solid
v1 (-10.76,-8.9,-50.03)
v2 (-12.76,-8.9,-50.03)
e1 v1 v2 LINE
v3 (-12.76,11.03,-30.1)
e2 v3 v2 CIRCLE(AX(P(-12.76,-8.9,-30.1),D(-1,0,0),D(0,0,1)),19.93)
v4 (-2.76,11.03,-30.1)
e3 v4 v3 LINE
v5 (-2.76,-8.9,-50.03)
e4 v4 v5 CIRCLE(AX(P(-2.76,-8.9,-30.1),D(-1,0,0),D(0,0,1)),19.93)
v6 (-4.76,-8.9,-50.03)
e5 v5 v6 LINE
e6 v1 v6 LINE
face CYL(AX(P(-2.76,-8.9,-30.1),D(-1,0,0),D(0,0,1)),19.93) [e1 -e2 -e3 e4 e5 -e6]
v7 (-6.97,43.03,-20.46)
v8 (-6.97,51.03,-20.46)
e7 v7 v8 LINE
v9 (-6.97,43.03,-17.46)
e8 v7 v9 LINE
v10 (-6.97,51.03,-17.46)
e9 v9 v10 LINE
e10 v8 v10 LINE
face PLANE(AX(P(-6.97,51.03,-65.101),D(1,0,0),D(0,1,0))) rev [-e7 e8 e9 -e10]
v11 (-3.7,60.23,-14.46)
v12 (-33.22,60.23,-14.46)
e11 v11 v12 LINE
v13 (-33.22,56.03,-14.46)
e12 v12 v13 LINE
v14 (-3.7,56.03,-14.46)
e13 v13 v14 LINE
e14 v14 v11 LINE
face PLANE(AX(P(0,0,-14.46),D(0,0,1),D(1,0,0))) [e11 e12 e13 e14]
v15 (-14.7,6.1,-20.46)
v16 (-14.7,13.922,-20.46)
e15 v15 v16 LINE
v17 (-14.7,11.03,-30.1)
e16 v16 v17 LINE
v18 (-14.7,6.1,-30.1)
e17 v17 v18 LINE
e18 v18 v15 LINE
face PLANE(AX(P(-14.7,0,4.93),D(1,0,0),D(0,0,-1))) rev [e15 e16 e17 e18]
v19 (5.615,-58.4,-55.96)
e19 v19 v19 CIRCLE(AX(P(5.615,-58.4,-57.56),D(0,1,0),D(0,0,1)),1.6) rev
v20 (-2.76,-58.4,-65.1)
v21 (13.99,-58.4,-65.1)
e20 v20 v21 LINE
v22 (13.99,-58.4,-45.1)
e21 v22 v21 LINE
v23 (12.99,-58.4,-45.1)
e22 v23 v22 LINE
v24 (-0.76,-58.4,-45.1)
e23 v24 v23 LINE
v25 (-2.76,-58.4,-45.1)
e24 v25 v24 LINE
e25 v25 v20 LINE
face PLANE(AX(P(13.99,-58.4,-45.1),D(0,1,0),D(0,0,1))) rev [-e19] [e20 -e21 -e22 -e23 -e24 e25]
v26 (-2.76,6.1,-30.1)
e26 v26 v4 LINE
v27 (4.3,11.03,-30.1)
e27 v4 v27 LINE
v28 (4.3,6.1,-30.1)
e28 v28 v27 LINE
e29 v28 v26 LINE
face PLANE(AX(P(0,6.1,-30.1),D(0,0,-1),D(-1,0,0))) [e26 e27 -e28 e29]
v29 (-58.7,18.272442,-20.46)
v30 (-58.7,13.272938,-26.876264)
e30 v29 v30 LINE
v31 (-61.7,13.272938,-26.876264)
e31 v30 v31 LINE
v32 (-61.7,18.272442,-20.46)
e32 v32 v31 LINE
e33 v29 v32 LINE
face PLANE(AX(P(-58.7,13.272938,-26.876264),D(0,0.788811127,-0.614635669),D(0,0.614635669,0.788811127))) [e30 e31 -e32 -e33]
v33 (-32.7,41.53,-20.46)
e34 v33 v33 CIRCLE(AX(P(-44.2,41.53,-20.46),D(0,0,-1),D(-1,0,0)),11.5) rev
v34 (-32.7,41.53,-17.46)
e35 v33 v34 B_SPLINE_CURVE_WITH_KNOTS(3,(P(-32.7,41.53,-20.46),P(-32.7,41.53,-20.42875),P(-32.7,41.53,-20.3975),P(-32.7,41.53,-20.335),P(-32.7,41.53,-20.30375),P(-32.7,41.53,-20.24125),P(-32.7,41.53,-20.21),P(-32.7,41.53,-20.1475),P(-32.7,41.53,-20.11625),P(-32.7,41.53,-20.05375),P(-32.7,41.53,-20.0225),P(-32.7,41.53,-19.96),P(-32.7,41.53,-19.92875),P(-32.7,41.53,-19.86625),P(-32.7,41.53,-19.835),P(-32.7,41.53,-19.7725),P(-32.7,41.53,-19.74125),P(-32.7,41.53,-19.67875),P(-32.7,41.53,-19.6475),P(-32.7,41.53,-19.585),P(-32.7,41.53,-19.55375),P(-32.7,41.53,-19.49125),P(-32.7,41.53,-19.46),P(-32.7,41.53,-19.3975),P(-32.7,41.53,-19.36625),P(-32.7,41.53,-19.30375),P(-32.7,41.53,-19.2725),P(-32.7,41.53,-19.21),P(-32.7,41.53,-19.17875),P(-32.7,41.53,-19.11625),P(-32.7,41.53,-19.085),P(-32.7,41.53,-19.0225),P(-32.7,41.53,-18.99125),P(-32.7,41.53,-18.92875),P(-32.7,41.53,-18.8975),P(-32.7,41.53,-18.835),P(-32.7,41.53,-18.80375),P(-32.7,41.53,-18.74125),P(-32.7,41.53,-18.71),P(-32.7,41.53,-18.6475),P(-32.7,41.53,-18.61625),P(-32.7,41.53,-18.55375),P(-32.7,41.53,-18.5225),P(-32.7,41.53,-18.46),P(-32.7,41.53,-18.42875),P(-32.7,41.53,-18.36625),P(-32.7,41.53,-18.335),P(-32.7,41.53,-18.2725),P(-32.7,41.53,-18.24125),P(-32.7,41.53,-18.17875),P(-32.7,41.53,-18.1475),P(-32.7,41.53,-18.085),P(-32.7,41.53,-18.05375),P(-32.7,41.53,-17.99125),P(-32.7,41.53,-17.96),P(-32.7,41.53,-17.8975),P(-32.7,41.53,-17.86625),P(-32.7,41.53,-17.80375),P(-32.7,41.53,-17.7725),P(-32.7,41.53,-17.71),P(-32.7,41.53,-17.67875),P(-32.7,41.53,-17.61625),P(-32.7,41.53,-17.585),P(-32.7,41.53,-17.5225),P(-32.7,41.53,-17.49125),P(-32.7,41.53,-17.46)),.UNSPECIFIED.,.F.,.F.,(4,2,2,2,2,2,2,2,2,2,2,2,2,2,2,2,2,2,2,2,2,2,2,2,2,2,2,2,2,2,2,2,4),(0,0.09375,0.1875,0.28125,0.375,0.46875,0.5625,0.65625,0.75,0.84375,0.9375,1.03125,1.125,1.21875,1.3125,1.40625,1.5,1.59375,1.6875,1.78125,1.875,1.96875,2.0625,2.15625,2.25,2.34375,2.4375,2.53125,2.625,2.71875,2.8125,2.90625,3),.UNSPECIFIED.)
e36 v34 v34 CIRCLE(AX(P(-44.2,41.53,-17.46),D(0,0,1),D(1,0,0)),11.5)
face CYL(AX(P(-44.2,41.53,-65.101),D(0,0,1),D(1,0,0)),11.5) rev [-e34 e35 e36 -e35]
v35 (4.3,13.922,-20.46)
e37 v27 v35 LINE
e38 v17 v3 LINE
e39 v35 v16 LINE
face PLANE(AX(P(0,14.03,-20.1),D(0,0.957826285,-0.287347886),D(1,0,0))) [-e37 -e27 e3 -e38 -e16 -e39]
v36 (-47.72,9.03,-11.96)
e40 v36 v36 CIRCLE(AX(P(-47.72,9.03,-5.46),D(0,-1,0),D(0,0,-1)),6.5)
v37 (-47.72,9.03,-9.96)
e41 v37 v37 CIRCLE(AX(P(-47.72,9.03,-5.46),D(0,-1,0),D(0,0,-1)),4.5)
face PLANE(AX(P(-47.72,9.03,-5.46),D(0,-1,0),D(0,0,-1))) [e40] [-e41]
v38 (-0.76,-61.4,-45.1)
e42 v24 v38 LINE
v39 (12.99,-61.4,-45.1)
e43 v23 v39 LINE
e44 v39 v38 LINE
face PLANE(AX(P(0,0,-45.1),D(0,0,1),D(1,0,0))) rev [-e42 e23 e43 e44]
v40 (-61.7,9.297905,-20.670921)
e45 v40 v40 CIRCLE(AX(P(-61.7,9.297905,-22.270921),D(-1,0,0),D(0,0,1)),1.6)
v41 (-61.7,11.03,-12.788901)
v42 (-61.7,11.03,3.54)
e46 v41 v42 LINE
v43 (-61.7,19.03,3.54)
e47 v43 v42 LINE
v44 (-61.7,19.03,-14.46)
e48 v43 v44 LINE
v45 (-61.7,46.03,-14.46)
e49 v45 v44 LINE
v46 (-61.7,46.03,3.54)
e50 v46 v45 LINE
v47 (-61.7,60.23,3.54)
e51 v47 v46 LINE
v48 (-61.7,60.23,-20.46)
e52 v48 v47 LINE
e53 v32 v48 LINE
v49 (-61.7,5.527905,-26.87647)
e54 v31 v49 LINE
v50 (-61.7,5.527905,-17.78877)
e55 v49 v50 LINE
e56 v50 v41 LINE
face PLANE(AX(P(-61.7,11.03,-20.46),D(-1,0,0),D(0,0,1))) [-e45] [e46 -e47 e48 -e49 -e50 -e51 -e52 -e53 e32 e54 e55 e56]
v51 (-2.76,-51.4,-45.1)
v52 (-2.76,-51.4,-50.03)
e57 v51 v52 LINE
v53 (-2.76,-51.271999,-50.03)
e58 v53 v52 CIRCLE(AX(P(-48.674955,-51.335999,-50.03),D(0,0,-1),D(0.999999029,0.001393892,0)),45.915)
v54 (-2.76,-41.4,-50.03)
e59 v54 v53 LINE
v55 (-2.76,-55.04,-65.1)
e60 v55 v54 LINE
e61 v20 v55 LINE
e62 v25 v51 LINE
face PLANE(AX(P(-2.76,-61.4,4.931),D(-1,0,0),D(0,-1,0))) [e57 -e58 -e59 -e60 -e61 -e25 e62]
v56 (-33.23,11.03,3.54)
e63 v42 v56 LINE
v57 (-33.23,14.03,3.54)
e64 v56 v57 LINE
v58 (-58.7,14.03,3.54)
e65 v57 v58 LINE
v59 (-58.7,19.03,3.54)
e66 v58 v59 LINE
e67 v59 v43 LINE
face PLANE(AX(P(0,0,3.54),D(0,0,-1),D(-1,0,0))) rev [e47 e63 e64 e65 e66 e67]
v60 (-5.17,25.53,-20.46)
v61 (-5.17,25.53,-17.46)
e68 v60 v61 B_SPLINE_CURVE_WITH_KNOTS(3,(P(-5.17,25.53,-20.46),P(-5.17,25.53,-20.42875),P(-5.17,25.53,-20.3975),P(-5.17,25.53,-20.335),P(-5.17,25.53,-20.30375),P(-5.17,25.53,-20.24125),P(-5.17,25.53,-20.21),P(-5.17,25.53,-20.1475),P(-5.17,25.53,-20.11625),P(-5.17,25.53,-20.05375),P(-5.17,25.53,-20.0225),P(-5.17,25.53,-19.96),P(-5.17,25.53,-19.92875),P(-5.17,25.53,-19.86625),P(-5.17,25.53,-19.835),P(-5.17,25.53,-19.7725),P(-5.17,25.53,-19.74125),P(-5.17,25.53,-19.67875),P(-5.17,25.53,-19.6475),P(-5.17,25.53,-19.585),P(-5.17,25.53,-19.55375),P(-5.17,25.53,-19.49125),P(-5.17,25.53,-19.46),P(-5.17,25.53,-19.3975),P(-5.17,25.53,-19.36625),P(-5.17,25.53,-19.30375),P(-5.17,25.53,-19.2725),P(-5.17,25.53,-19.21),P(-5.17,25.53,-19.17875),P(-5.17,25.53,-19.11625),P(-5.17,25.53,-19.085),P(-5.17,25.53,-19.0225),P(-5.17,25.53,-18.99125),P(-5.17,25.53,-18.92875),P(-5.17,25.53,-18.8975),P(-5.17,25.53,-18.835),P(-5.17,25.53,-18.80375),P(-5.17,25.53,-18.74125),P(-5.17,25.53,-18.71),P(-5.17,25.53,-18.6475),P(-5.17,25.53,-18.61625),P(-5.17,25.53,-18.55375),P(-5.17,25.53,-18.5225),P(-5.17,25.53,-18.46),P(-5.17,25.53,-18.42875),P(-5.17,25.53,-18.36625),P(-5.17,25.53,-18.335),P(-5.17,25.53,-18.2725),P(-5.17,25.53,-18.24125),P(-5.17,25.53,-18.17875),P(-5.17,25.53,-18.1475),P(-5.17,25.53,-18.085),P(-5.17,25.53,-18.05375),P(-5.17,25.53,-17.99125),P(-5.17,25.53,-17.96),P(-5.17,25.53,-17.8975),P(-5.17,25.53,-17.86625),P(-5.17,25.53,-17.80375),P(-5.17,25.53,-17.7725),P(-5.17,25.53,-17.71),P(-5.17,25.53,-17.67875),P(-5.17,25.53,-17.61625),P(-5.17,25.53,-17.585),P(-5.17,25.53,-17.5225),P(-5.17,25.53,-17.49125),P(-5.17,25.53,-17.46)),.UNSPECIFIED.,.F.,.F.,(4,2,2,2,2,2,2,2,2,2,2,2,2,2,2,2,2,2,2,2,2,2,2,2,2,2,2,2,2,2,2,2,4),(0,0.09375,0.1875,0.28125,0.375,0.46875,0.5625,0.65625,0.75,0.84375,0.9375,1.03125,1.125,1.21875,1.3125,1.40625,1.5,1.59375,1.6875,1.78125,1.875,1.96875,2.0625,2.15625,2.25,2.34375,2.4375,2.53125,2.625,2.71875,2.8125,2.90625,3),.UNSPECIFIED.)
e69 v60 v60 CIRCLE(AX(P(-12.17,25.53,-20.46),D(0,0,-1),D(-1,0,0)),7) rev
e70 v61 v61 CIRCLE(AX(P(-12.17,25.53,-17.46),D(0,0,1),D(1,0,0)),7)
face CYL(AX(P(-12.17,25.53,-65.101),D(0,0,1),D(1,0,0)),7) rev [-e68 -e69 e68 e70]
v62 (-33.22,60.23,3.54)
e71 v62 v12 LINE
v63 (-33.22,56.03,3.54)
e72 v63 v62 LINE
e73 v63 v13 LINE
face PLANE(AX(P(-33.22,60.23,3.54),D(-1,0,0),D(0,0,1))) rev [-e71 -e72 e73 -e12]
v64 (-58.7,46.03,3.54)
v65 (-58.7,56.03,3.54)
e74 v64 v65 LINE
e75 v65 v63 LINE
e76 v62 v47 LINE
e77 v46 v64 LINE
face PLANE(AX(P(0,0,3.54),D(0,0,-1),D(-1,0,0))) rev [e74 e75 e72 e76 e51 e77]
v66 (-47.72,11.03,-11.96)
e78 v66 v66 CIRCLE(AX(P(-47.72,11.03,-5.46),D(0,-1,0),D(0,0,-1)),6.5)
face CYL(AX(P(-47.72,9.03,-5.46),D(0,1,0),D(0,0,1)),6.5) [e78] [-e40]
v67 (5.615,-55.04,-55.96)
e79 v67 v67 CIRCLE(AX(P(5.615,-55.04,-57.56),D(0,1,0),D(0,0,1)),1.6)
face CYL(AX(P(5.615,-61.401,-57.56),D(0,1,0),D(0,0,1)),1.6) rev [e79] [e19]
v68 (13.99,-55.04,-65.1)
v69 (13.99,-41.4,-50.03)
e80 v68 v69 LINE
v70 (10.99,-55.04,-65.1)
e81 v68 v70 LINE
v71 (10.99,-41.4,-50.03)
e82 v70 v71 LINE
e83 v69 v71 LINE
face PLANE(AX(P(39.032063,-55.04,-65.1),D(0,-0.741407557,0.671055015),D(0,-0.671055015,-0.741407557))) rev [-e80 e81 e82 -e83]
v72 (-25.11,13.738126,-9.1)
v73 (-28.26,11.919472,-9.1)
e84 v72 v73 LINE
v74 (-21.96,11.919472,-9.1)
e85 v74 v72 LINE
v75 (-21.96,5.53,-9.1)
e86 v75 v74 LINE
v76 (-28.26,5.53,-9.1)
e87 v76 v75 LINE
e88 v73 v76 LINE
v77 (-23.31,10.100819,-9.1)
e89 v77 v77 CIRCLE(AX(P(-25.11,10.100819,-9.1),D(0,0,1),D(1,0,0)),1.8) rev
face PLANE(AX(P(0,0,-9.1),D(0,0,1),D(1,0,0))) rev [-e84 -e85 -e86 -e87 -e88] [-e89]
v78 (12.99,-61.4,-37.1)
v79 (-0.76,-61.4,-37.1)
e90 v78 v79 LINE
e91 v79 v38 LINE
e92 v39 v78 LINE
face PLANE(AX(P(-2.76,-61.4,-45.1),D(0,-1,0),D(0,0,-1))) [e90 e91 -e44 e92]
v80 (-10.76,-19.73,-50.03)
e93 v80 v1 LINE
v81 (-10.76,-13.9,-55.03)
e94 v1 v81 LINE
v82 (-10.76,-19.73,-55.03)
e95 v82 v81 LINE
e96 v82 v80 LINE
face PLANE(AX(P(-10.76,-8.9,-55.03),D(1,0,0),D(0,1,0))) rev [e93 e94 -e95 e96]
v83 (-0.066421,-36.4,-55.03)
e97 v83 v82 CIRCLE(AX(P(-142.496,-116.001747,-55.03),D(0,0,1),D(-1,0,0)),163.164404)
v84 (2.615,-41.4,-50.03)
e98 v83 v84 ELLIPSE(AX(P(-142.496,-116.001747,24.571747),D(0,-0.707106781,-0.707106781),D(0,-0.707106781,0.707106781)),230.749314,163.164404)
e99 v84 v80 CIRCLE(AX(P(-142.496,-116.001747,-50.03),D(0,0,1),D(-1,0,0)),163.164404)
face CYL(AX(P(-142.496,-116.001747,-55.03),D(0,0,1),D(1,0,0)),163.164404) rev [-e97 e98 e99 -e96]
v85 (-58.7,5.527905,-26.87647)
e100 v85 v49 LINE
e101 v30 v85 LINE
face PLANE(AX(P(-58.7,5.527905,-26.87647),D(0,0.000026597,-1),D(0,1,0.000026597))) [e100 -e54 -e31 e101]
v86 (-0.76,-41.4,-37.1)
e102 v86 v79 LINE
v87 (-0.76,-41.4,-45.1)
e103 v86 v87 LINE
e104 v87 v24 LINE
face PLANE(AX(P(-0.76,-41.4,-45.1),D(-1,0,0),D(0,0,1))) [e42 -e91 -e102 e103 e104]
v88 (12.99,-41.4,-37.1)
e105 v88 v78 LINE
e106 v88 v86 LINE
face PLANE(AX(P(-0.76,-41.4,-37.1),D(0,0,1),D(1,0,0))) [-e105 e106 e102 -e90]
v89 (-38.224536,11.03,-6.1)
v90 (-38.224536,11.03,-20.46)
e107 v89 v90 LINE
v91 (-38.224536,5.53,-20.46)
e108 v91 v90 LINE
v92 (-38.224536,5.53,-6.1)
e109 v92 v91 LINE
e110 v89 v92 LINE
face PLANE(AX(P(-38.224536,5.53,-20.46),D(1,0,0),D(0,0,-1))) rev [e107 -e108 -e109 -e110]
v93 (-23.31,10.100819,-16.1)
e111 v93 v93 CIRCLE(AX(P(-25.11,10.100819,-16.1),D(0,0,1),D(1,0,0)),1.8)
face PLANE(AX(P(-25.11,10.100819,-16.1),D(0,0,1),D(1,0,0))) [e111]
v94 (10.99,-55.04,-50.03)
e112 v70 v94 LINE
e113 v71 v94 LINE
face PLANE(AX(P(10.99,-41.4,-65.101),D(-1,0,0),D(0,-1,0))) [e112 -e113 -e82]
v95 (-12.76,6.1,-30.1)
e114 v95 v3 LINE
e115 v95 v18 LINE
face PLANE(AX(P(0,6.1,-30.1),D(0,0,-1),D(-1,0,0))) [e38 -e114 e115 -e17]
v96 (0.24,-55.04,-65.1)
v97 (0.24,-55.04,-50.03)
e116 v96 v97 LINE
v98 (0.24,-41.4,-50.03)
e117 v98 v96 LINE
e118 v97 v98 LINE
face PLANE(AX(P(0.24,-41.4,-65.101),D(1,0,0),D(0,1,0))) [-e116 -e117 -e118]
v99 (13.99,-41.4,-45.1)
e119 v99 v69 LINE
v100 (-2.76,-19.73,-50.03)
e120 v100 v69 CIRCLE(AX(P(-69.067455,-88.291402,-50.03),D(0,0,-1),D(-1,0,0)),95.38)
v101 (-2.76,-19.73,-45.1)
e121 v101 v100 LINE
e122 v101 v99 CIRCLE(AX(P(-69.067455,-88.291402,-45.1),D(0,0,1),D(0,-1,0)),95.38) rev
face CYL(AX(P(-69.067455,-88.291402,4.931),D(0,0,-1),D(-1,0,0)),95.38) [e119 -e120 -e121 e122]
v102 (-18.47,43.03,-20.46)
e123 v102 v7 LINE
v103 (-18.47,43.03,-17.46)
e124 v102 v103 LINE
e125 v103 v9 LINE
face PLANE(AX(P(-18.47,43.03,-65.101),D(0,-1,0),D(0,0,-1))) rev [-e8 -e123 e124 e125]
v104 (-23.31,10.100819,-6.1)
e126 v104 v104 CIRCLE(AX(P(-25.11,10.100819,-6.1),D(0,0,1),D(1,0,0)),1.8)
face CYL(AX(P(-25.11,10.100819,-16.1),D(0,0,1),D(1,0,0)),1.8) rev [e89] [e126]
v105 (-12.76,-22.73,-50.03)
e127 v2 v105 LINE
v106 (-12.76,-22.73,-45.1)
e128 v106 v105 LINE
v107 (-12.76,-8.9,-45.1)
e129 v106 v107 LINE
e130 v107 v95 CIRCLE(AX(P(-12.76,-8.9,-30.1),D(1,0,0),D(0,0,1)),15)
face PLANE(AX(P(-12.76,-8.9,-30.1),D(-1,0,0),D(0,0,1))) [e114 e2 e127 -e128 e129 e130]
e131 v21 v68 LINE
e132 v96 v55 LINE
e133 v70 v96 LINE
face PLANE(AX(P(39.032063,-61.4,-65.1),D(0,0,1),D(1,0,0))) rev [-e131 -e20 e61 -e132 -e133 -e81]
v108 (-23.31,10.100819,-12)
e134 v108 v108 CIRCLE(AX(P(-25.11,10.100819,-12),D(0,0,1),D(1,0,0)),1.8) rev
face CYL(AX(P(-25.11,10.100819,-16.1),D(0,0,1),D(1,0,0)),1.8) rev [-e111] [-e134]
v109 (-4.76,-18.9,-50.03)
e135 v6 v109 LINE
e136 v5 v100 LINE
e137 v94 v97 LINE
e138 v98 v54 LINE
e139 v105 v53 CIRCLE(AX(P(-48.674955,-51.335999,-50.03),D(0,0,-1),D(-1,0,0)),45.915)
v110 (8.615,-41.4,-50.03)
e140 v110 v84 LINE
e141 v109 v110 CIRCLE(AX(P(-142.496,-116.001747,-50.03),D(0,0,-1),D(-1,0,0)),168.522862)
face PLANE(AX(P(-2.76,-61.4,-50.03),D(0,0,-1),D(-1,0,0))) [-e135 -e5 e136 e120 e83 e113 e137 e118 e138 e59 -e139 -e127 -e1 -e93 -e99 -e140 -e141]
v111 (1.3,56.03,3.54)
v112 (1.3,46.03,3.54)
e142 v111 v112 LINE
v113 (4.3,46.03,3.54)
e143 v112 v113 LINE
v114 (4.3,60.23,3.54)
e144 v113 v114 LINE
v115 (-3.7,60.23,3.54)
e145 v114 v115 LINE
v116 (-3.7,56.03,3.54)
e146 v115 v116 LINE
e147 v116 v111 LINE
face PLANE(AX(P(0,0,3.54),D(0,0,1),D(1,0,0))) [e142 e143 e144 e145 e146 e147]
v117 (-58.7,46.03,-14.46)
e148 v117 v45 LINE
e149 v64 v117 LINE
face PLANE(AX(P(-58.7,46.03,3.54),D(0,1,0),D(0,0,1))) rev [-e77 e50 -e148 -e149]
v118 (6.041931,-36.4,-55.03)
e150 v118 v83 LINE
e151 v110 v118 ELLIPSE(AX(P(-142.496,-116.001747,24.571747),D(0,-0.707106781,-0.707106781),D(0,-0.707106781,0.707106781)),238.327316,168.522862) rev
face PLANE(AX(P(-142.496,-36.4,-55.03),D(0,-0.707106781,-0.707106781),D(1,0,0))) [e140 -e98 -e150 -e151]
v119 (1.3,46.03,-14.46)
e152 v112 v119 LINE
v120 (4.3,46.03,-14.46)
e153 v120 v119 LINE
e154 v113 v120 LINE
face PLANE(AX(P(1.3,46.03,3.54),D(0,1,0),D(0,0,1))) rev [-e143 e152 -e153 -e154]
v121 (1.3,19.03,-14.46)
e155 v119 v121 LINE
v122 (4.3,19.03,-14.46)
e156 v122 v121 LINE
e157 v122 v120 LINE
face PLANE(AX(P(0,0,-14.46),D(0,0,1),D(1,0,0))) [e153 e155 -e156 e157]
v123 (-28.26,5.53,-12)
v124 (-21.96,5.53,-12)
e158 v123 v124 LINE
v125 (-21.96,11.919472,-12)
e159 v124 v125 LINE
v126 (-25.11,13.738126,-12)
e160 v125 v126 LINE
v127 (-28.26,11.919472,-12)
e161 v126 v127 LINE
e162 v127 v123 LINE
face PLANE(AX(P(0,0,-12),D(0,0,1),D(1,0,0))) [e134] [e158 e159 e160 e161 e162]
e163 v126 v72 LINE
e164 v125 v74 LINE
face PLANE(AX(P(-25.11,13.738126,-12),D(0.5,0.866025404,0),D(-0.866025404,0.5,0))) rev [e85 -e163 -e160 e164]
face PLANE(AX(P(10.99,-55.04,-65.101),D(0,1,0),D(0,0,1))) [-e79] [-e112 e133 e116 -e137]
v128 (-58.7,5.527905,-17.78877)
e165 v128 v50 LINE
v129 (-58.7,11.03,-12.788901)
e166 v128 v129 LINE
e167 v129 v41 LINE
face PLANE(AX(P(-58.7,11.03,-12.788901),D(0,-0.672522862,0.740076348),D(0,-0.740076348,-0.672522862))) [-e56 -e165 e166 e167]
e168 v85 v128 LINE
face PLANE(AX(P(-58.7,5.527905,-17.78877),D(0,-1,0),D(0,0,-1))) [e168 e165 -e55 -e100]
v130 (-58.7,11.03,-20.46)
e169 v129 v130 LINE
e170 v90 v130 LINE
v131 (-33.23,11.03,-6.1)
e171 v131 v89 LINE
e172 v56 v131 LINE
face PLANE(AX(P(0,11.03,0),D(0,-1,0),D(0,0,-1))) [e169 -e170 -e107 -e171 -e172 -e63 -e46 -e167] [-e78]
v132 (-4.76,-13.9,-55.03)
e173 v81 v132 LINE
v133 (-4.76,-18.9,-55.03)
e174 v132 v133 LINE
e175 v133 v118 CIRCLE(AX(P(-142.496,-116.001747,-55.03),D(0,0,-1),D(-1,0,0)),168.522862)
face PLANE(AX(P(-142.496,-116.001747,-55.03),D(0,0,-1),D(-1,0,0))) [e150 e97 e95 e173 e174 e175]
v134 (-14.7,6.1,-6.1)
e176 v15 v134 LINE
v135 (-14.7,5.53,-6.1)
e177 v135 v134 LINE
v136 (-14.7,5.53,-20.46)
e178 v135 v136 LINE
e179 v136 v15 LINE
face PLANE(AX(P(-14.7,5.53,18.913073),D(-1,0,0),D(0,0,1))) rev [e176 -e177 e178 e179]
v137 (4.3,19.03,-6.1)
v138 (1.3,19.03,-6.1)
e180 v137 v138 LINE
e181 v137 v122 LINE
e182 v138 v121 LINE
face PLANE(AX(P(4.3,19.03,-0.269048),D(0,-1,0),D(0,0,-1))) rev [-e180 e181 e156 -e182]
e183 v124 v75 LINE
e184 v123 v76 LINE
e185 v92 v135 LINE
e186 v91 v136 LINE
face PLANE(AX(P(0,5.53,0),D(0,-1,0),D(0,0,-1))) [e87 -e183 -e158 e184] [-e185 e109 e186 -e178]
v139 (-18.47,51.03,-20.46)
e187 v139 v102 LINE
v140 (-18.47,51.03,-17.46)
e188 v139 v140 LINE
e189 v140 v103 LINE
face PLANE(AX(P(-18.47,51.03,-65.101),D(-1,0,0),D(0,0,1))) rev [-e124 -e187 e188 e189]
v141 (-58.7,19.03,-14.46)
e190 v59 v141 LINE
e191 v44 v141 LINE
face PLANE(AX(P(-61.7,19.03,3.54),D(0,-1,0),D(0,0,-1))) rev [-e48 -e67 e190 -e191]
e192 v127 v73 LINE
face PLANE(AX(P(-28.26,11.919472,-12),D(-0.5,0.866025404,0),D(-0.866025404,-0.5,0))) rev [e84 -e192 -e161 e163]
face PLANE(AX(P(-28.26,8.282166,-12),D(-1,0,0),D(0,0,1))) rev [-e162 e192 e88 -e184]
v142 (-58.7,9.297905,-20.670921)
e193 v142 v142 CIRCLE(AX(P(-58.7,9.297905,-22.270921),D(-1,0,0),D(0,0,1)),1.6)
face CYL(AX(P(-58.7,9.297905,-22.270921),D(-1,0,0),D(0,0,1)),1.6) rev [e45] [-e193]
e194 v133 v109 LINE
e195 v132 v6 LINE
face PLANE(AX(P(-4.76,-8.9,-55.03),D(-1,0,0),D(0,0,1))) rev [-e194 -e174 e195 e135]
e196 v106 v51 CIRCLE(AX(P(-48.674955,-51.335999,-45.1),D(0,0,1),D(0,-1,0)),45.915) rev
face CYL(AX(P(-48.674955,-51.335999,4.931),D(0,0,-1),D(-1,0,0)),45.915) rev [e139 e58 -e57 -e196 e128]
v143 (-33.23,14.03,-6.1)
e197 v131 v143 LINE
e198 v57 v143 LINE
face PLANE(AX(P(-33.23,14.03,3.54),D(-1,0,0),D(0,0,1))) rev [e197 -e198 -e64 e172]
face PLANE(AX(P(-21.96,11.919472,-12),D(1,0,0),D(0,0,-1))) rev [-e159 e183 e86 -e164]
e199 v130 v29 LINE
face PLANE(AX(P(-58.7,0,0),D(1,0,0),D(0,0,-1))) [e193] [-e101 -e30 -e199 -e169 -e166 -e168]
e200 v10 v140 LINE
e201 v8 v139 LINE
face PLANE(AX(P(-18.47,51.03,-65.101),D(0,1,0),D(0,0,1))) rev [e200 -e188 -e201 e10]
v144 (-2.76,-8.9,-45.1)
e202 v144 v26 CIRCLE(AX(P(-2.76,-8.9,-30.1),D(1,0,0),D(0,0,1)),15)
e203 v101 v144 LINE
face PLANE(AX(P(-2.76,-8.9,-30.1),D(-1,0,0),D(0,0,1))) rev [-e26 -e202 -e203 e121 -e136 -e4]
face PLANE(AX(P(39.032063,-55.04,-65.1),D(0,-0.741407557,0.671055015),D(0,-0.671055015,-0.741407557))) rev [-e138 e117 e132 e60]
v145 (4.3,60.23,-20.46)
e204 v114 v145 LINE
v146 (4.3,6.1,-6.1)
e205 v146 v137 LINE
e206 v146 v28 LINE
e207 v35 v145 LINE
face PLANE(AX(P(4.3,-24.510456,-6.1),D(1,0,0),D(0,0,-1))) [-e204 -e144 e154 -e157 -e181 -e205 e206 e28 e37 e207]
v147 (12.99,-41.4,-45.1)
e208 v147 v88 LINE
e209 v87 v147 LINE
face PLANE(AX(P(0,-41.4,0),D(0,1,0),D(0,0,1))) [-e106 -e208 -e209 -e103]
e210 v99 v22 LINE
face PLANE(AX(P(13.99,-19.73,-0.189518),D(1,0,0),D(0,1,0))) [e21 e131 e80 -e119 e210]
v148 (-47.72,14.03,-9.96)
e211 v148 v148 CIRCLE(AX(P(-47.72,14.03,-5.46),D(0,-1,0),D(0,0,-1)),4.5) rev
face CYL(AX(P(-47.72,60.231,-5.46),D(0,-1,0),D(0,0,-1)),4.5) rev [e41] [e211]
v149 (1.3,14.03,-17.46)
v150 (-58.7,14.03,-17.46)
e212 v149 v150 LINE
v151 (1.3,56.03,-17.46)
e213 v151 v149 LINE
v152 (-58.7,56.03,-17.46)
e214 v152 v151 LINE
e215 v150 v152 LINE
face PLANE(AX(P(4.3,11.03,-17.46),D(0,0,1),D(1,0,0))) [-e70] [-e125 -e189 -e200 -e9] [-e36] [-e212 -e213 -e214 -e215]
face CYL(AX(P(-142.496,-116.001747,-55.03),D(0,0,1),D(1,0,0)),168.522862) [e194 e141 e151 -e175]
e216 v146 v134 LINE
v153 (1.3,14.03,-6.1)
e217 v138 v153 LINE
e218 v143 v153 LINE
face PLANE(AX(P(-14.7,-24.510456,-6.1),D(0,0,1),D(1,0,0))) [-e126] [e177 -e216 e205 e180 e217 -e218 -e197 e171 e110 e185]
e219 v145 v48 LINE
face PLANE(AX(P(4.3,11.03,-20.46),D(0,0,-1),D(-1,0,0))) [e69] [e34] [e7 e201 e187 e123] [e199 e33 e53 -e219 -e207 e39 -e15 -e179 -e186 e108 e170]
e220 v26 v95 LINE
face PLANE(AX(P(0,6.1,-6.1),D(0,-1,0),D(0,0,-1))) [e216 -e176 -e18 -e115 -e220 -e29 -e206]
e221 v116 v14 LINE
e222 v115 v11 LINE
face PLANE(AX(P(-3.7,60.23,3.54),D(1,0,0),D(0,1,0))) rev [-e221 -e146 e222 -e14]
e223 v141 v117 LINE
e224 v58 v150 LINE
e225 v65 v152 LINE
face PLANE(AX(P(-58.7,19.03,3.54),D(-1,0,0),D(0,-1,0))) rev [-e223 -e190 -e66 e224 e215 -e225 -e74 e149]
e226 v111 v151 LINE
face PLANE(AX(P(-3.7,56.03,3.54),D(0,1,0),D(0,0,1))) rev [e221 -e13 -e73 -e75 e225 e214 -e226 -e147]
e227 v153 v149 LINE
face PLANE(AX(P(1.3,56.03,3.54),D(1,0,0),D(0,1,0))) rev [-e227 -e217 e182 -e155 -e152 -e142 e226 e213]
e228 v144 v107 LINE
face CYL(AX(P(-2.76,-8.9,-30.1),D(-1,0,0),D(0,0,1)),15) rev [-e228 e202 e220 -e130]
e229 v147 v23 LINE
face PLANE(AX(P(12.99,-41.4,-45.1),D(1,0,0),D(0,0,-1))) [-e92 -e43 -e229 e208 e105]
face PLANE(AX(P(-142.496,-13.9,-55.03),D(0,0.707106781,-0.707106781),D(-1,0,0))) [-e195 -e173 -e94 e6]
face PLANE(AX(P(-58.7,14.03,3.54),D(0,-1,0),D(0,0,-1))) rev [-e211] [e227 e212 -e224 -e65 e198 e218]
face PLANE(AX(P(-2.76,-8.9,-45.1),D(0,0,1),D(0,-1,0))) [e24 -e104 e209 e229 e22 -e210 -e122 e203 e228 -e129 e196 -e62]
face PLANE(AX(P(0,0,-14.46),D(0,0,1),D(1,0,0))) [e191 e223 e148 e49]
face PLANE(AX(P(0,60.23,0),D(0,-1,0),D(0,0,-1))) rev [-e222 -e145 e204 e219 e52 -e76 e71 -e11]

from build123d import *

# Parameters (mm, degrees)
RESSALTO_EXTRUS_O1_DEPTH              = 4.93
RESSALTO_EXTRUS_O2_DEPTH              = 14.7
RESSALTO_EXTRUS_O3_DEPTH              = 10
ESBO_O5_W                             = 16.75
ESBO_O5_H                             = 41.67
RESSALTO_EXTRUS_O4_DEPTH              = 4.93
CORTE_EXTRUS_O1_REACH                 = 85.706
RESSALTO_EXTRUS_O5_DEPTH              = 16.75
RESSALTO_EXTRUS_O6_DEPTH              = 19
CORTE_EXTRUS_O2_REACH                 = 96.288
ESBO_O9_W                             = 10.75
ESBO_O9_H                             = 13.64
CORTE_EXTRUS_O3_REACH                 = 96.288
ESBO_O10_W                            = 13
ESBO_O10_H                            = 15.64
ESBO_O11_W                            = 13.75
ESBO_O11_H                            = 8
RESSALTO_EXTRUS_O7_DEPTH              = 20
ESBO_O12_W                            = 6
ESBO_O12_H                            = 39.4
RESSALTO_EXTRUS_O8_DEPTH              = 5
RESSALTO_EXTRUS_O9_DEPTH              = 5
CHANFRO1_SIZE                         = 5
CHANFRO2_SIZE                         = 5
CORTE_EXTRUS_O4_REACH                 = 95.911
ESBO_O14_R                            = 1.6
ESBO_O15_W                            = 19
ESBO_O15_H                            = 24
RESSALTO_EXTRUS_O10_DEPTH             = 3
RESSALTO_EXTRUS_O10_DIRECTION_2_REACH = 100.49
RESSALTO_EXTRUS_O11_DEPTH             = 46.2
RESSALTO_EXTRUS_O11_DEPTH_BACK        = 3
ESBO_O16_W                            = 66
ESBO_O16_H                            = 3
RESSALTO_EXTRUS_O12_DEPTH             = 21
ESBO_O18_W                            = 29.52
ESBO_O18_H                            = 4.2
ESBO_O18_W_2                          = 3
ESBO_O18_H_2                          = 32
ESBO_O18_W_3                          = 18.53
ESBO_O18_H_3                          = 3
ESBO_O18_H_4                          = 27
RESSALTO_EXTRUS_O13_DEPTH             = 3
CORTE_EXTRUS_O5_REACH                 = 101.229
ESBO_O19_R                            = 11.5
ESBO_O19_R_2                          = 7
ESBO_O19_W                            = 11.5
ESBO_O19_H                            = 8
CHANFRO3_SIZE                         = 3
CHANFRO3_SIZE_2                       = 10
CORTE_EXTRUS_O6_REACH                 = 117.287
ESBO_O20_R                            = 4.5
RESSALTO_EXTRUS_O14_START             = 2
ESBO_O21_R                            = 6.5
ESBO_O21_R_2                          = 4.5
RESSALTO_EXTRUS_O14_DEPTH             = 2
ESBO_O24_W                            = 3
ESBO_O24_H                            = 5
RESSALTO_EXTRUS_O15_DEPTH             = 8.36
ESBO_O25_W                            = 8
ESBO_O25_H                            = 6
RESSALTO_EXTRUS_O16_DEPTH             = 5.5
ESBO_O26_R                            = 1.6
RESSALTO_EXTRUS_O17_DEPTH             = 3
ESBO_O28_W                            = 16.75
ESBO_O28_H                            = 3
CORTE_EXTRUS_O7_DEPTH                 = 20
ESBO_O29_W                            = 19
ESBO_O29_H                            = 2.999181093
CORTE_EXTRUS_O8_DEPTH                 = 20
ESBO_O30_W                            = 19
ESBO_O30_H                            = 72.430818907
CORTE_EXTRUS_O9_DEPTH                 = 106.156312221
RESSALTO_EXTRUS_O18_REACH             = 102.704
ESBO_O31_W                            = 23.524536133
ESBO_O31_H                            = 8.5
RESSALTO_EXTRUS_O18_DIRECTION_2_REACH = 102.704
ESBO_O32_R                            = 1.8
CORTE_EXTRUS_O10_DEPTH                = 10
CORTE_EXTRUS_O11_START                = -3
CORTE_EXTRUS_O11_DEPTH                = 2.9


# Some blends are built 0.0001 mm under size
with BuildPart() as part:
    # Esboço1 → Ressalto-extrusão1 (new body)
    with BuildSketch(Plane.XY):
        Polygon((0, 0), (-14.7, 0), (-14.7, -61.4), (4.3, -61.4), (4.3, -39.4), align=None)
    extrude(amount=RESSALTO_EXTRUS_O1_DEPTH)

    # Esboço2 → Ressalto-extrusão2 (add)
    with BuildSketch(Plane.ZY.offset(14.7)):
        with BuildLine():
            Line((0, 0), (4.93, 0))
            ThreePointArc((4.93, 0), (1.699387796, 7.799387796), (-6.1, 11.03))
            Line((-6.1, 11.03), (-30.1, 11.03))
            Line((-30.1, 11.03), (-30.1, 6.1))
            Line((-30.1, 6.1), (-6.1, 6.1))
            ThreePointArc((-6.1, 6.1), (-1.786648635, 4.313351365), (0, 0))
        make_face()
    extrude(amount=-RESSALTO_EXTRUS_O2_DEPTH)

    # Esboço4 → Ressalto-extrusão3 (add)
    with BuildSketch(Plane.ZY.offset(12.76)):
        with BuildLine():
            Line((-30.1, 11.03), (-30.1, 6.1))
            ThreePointArc((-30.1, 6.1), (-40.706601718, 1.706601718), (-45.1, -8.9))
            Line((-45.1, -8.9), (-45.1, -61.4))
            Line((-45.1, -61.4), (-50.03, -61.4))
            Line((-50.03, -61.4), (-50.03, -8.9))
            ThreePointArc((-50.03, -8.9), (-44.192638149, 5.192638149), (-30.1, 11.03))
        make_face()
    extrude(amount=-RESSALTO_EXTRUS_O3_DEPTH)

    # Esboço5 → Ressalto-extrusão4 (add)
    with BuildSketch(Plane(origin=(0, 0, -50.03), x_dir=(-1, 0, 0), z_dir=(0, 0, -1))):
        with Locations((-5.615, -40.565)):
            Rectangle(ESBO_O5_W, ESBO_O5_H)
    extrude(amount=-RESSALTO_EXTRUS_O4_DEPTH)

    # Esboço6 → Corte-extrusão1 (cut, up to next)
    with BuildSketch(Plane(origin=(0, 0, -50.03), x_dir=(-1, 0, 0), z_dir=(0, 0, -1)), mode=Mode.PRIVATE) as corte_extrus_o1_sk1:
        with BuildLine():
            Line((12.76, -61.4), (2.76, -61.4))
            Line((2.76, -61.4), (2.76, -51.4))
            ThreePointArc((2.76, -51.4), (5.321457267, -36.21444446), (12.76, -22.73))
            Line((12.76, -22.73), (12.76, -61.4))
        make_face()
    corte_extrus_o1_tool1 = extrude(corte_extrus_o1_sk1.sketch, amount=-CORTE_EXTRUS_O1_REACH, mode=Mode.PRIVATE) & part.part
    # Esboço6 → Corte-extrusão1 (cut, up to next)
    with BuildSketch(Plane(origin=(0, 0, -50.03), x_dir=(-1, 0, 0), z_dir=(0, 0, -1)), mode=Mode.PRIVATE) as corte_extrus_o1_sk2:
        with BuildLine():
            Line((-13.99, -41.4), (-13.99, -19.73))
            Line((-13.99, -19.73), (2.76, -19.73))
            ThreePointArc((2.76, -19.73), (-6.396882999, -29.960637276), (-13.99, -41.4))
        make_face()
    corte_extrus_o1_tool2 = extrude(corte_extrus_o1_sk2.sketch, amount=-CORTE_EXTRUS_O1_REACH, mode=Mode.PRIVATE) & part.part
    add(corte_extrus_o1_tool1.solids().sort_by_distance((-8.393606, -45.852679, -50.03))[0], mode=Mode.SUBTRACT)
    add(corte_extrus_o1_tool2.solids().sort_by_distance((8.680645, -26.580869, -50.03))[0], mode=Mode.SUBTRACT)

    # Esboço7 → Ressalto-extrusão5 (add)
    with BuildSketch(Plane.ZY.offset(2.76)):
        Polygon((-50.03, -61.4), (-65.1, -61.4), (-65.1, -55.04), (-50.03, -41.4), align=None)
    extrude(amount=-RESSALTO_EXTRUS_O5_DEPTH)

    # Esboço8 → Ressalto-extrusão6 (add)
    with BuildSketch(Plane.ZY.offset(14.7)):
        Polygon((4.93, -61.4), (20, -61.4), (20, -55.04), (4.93, -39.4), align=None)
    extrude(amount=-RESSALTO_EXTRUS_O6_DEPTH)

    # Esboço9 → Corte-extrusão2 (cut, up to next)
    with BuildSketch(Plane(origin=(0, 0, -50.03), x_dir=(-1, 0, 0), z_dir=(0, 0, -1)), mode=Mode.PRIVATE) as corte_extrus_o2_sk1:
        with Locations((-5.615, -48.22)):
            Rectangle(ESBO_O9_W, ESBO_O9_H)
    corte_extrus_o2_tool1 = extrude(corte_extrus_o2_sk1.sketch, amount=CORTE_EXTRUS_O2_REACH, mode=Mode.PRIVATE) & part.part
    add(corte_extrus_o2_tool1.solids().sort_by_distance((5.615, -48.22, -50.03))[0], mode=Mode.SUBTRACT)

    # Esboço10 → Corte-extrusão3 (cut, up to next)
    with BuildSketch(Plane.XY.offset(4.93), mode=Mode.PRIVATE) as corte_extrus_o3_sk1:
        with Locations((-5.2, -47.22)):
            Rectangle(ESBO_O10_W, ESBO_O10_H)
    corte_extrus_o3_tool1 = extrude(corte_extrus_o3_sk1.sketch, amount=CORTE_EXTRUS_O3_REACH, mode=Mode.PRIVATE) & part.part
    add(corte_extrus_o3_tool1.solids().sort_by_distance((-5.2, -47.22, 4.93))[0], mode=Mode.SUBTRACT)

    # Esboço11 → Ressalto-extrusão7 (add)
    with BuildSketch(Plane.XZ.offset(61.4)):
        with Locations((6.115, -41.1)):
            Rectangle(ESBO_O11_W, ESBO_O11_H)
    extrude(amount=-RESSALTO_EXTRUS_O7_DEPTH)

    # Esboço12 → Ressalto-extrusão8 (add)
    with BuildSketch(Plane.XY.offset(4.93)):
        with Locations((-7.35, -19.7)):
            Rectangle(ESBO_O12_W, ESBO_O12_H)
    extrude(amount=RESSALTO_EXTRUS_O8_DEPTH)

    # Esboço13 → Ressalto-extrusão9 (add)
    with BuildSketch(Plane(origin=(0, 0, -50.03), x_dir=(-1, 0, 0), z_dir=(0, 0, -1))):
        with BuildLine():
            Line((10.76, -8.9), (4.76, -8.9))
            Line((4.76, -8.9), (4.76, -18.9))
            ThreePointArc((4.76, -18.9), (-2.365001835, -29.889929465), (-8.615, -41.4))
            Line((-8.615, -41.4), (-2.615, -41.4))
            ThreePointArc((-2.615, -41.4), (3.649096622, -30.303670043), (10.76, -19.73))
            Line((10.76, -19.73), (10.76, -8.9))
        make_face()
    extrude(amount=RESSALTO_EXTRUS_O9_DEPTH)

    # Chanfro1
    chanfro1_edges = [part.edges().sort_by_distance(p)[0] for p in [
        (-7.76, -8.9, -55.03),
        (5.615, -41.4, -55.03),
    ]]
    chamfer(chanfro1_edges, length=CHANFRO1_SIZE - 0.0001)  # a hair under: the kernel refuses the full size

    # Chanfro2
    chanfro2_edges = [part.edges().sort_by_distance(p)[0] for p in [
        (-7.35, -39.4, 9.93),
        (-7.35, 0, 9.93),
    ]]
    chamfer(chanfro2_edges, length=CHANFRO2_SIZE - 0.0001)  # a hair under: the kernel refuses the full size

    # Esboço14 → Corte-extrusão4 (cut, up to next)
    with BuildSketch(Plane(origin=(0, -55.04, 0), x_dir=(1, 0, 0), z_dir=(0, 1, 0)), mode=Mode.PRIVATE) as corte_extrus_o4_sk1:
        with Locations(Location((-5.2, -12.465, 0), (0, 0, 270))):
            Circle(ESBO_O14_R)
    corte_extrus_o4_tool1 = extrude(corte_extrus_o4_sk1.sketch, amount=-CORTE_EXTRUS_O4_REACH, mode=Mode.PRIVATE) & part.part
    # Esboço14 → Corte-extrusão4 (cut, up to next)
    with BuildSketch(Plane(origin=(0, -55.04, 0), x_dir=(1, 0, 0), z_dir=(0, 1, 0)), mode=Mode.PRIVATE) as corte_extrus_o4_sk2:
        with Locations(Location((5.615, 57.56, 0), (0, 0, 270))):
            Circle(ESBO_O14_R)
    corte_extrus_o4_tool2 = extrude(corte_extrus_o4_sk2.sketch, amount=-CORTE_EXTRUS_O4_REACH, mode=Mode.PRIVATE) & part.part
    add(corte_extrus_o4_tool1.solids().sort_by_distance((-5.2, -55.04, 12.465))[0], mode=Mode.SUBTRACT)
    add(corte_extrus_o4_tool2.solids().sort_by_distance((5.615, -55.04, -57.56))[0], mode=Mode.SUBTRACT)

    # Esboço15 → Ressalto-extrusão10 (add)
    with BuildSketch(Plane(origin=(0, 11.03, 0), x_dir=(1, 0, 0), z_dir=(0, 1, 0))):
        with Locations((-5.2, 18.1)):
            Rectangle(ESBO_O15_W, ESBO_O15_H)
    extrude(amount=RESSALTO_EXTRUS_O10_DEPTH)

    # Ressalto-extrusão10 direction 2: up to this face of the body (flat: up to its plane)
    ressalto_extrus_o10_direction_2_end = Plane(part.part.faces().sort_by_distance((-7.35, 6.1, -18.1))[0])
    # Esboço15 → Ressalto-extrusão10 direction 2 (add, up to the picked face)
    with BuildSketch(Plane(origin=(0, 11.03, 0), x_dir=(1, 0, 0), z_dir=(0, 1, 0)), mode=Mode.PRIVATE) as ressalto_extrus_o10_direction_2_sk1:
        with Locations((-5.2, 18.1)):
            Rectangle(ESBO_O15_W, ESBO_O15_H)
    ressalto_extrus_o10_direction_2_tool1 = split(extrude(ressalto_extrus_o10_direction_2_sk1.sketch, amount=-RESSALTO_EXTRUS_O10_DIRECTION_2_REACH, mode=Mode.PRIVATE), bisect_by=ressalto_extrus_o10_direction_2_end, keep=Keep.BOTH, mode=Mode.PRIVATE)
    add(ressalto_extrus_o10_direction_2_tool1.solids().sort_by(Axis((-5.2, 11.03, -18.1), (0, -1, 0)))[0])

    # Esboço16 → Ressalto-extrusão11 (add, two sides: drawn at the far end of the back side and taken through both)
    with BuildSketch(Plane(origin=(0, 14.03, 0), x_dir=(1, 0, 0), z_dir=(0, 1, 0)).offset(-RESSALTO_EXTRUS_O11_DEPTH_BACK)):
        with Locations((-28.7, 18.96)):
            Rectangle(ESBO_O16_W, ESBO_O16_H)
    extrude(amount=RESSALTO_EXTRUS_O11_DEPTH + RESSALTO_EXTRUS_O11_DEPTH_BACK)

    # Esboço17 → Ressalto-extrusão12 (add)
    with BuildSketch(Plane.XY.offset(-17.46)):
        Polygon((-61.7, 60.23), (-33.22, 60.23), (-33.22, 56.03), (-58.7, 56.03), (-58.7, 46.03), (-61.7, 46.03), align=None)
        Polygon((-61.7, 11.03), (-61.7, 19.03), (-58.7, 19.03), (-58.7, 14.03), (-33.23, 14.03), (-33.23, 11.03), align=None)
        Polygon((4.3, 60.23), (4.3, 46.03), (1.3, 46.03), (1.3, 56.03), (-3.7, 56.03), (-3.7, 60.23), align=None)
    extrude(amount=RESSALTO_EXTRUS_O12_DEPTH)

    # Esboço18 → Ressalto-extrusão13 (add)
    with BuildSketch(Plane.XY.offset(-17.46)):
        with Locations((-18.46, 58.13)):
            Rectangle(ESBO_O18_W, ESBO_O18_H)
        with Locations((2.8, 30.03)):
            Rectangle(ESBO_O18_W_2, ESBO_O18_H_2)
        with Locations((-23.965, 12.53)):
            Rectangle(ESBO_O18_W_3, ESBO_O18_H_3)
        with Locations((-60.2, 32.53)):
            Rectangle(ESBO_O18_W_2, ESBO_O18_H_4)
    extrude(amount=RESSALTO_EXTRUS_O13_DEPTH)

    # Esboço19 → Corte-extrusão5 (cut, up to next)
    with BuildSketch(Plane.XY.offset(-17.46), mode=Mode.PRIVATE) as corte_extrus_o5_sk1:
        with Locations((-44.2, 41.53)):
            Circle(ESBO_O19_R)
    corte_extrus_o5_tool1 = extrude(corte_extrus_o5_sk1.sketch, amount=-CORTE_EXTRUS_O5_REACH, mode=Mode.PRIVATE) & part.part
    # Esboço19 → Corte-extrusão5 (cut, up to next)
    with BuildSketch(Plane.XY.offset(-17.46), mode=Mode.PRIVATE) as corte_extrus_o5_sk2:
        with Locations((-12.17, 25.53)):
            Circle(ESBO_O19_R_2)
    corte_extrus_o5_tool2 = extrude(corte_extrus_o5_sk2.sketch, amount=-CORTE_EXTRUS_O5_REACH, mode=Mode.PRIVATE) & part.part
    # Esboço19 → Corte-extrusão5 (cut, up to next)
    with BuildSketch(Plane.XY.offset(-17.46), mode=Mode.PRIVATE) as corte_extrus_o5_sk3:
        with Locations((-12.72, 47.03)):
            Rectangle(ESBO_O19_W, ESBO_O19_H)
    corte_extrus_o5_tool3 = extrude(corte_extrus_o5_sk3.sketch, amount=-CORTE_EXTRUS_O5_REACH, mode=Mode.PRIVATE) & part.part
    add(corte_extrus_o5_tool1.solids().sort_by_distance((-44.2, 41.53, -17.46))[0], mode=Mode.SUBTRACT)
    add(corte_extrus_o5_tool2.solids().sort_by_distance((-12.17, 25.53, -17.46))[0], mode=Mode.SUBTRACT)
    add(corte_extrus_o5_tool3.solids().sort_by_distance((-12.72, 47.03, -17.46))[0], mode=Mode.SUBTRACT)

    # Chanfro3
    # the kernel refuses this chamfer: 10, 3 mm, written as the material it takes off along each edge
    with BuildSketch(Plane(origin=(30.259416678, 14.03, -30.1), x_dir=(0, -0.9925205348140391, -0.12207779475585895), z_dir=(-1, 0, 0))) as chanfro3_piece_1_section:
        Polygon((CHANFRO3_SIZE * 0.992520534814, CHANFRO3_SIZE * 0.122077794756), (-CHANFRO3_SIZE_2 * 0.122077794756, CHANFRO3_SIZE_2 * 0.992520534814), (0, 0), align=None)
    chanfro3_piece_1 = extrude(amount=70.918833356, mode=Mode.PRIVATE)
    chanfro3_piece_1 = split(chanfro3_piece_1, bisect_by=Plane(origin=(0.77, 13.028749035, -20.46), z_dir=(0, 0, -1)), keep=Keep.TOP, mode=Mode.PRIVATE)
    add(chanfro3_piece_1, mode=Mode.SUBTRACT)

    # Esboço20 → Corte-extrusão6 (cut, up to next)
    with BuildSketch(Plane.XZ.offset(-11.03), mode=Mode.PRIVATE) as corte_extrus_o6_sk1:
        with Locations(Location((-47.72, -5.46, 0), (0, 0, 270))):
            Circle(ESBO_O20_R)
    corte_extrus_o6_tool1 = extrude(corte_extrus_o6_sk1.sketch, amount=-CORTE_EXTRUS_O6_REACH, mode=Mode.PRIVATE) & part.part
    add(corte_extrus_o6_tool1.solids().sort_by_distance((-47.72, 11.03, -5.46))[0], mode=Mode.SUBTRACT)

    # Esboço21 → Ressalto-extrusão14 (add)
    with BuildSketch(Plane.XZ.offset(-11.03).offset(RESSALTO_EXTRUS_O14_START)):
        with Locations(Location((-47.72, -5.46, 0), (0, 0, 270))):
            Circle(ESBO_O21_R)
        with Locations(Location((-47.72, -5.46, 0), (0, 0, 270))):
            Circle(ESBO_O21_R_2, mode=Mode.SUBTRACT)
    extrude(amount=-RESSALTO_EXTRUS_O14_DEPTH)

    # Esboço24 → Ressalto-extrusão15 (add)
    with BuildSketch(Plane.XY.offset(-14.46)):
        with Locations((2.8, 16.53)):
            Rectangle(ESBO_O24_W, ESBO_O24_H)
    extrude(amount=RESSALTO_EXTRUS_O15_DEPTH)

    # Esboço25 → Ressalto-extrusão16 (add)
    with BuildSketch(Plane.XZ.offset(-11.03)):
        with Locations((-34.224536133, -17.46)):
            Rectangle(ESBO_O25_W, ESBO_O25_H)
    extrude(amount=RESSALTO_EXTRUS_O16_DEPTH)

    # Esboço26 → Ressalto-extrusão17 (add)
    with BuildSketch(Plane.ZY.offset(61.7)):
        Polygon((-12.788900808, 11.03), (-17.788769684, 5.527904968), (-26.876469574, 5.527904968), (-26.87626358, 13.272938232), (-20.46, 18.272442322), (-20.46, 11.03), align=None)
        with Locations((-22.27092052, 9.297904968)):
            Circle(ESBO_O26_R, mode=Mode.SUBTRACT)
    extrude(amount=-RESSALTO_EXTRUS_O17_DEPTH)

    # Esboço28 → Corte-extrusão7 (cut)
    with BuildSketch(Plane(origin=(0, 0, -65.1), x_dir=(-1, 0, 0), z_dir=(0, 0, -1))):
        with Locations((-5.615, -59.9)):
            Rectangle(ESBO_O28_W, ESBO_O28_H)
    extrude(amount=-CORTE_EXTRUS_O7_DEPTH, mode=Mode.SUBTRACT)

    # Esboço29 → Corte-extrusão8 (cut)
    with BuildSketch(Plane.XY.offset(20)):
        with Locations((-5.2, -59.900409454)):
            Rectangle(ESBO_O29_W, ESBO_O29_H)
    extrude(amount=-CORTE_EXTRUS_O8_DEPTH, mode=Mode.SUBTRACT)

    # Esboço30 → Corte-extrusão9 (cut, through all)
    with BuildSketch(Plane.XY.offset(-6.1)):
        with Locations((-5.2, -22.185409454)):
            Rectangle(ESBO_O30_W, ESBO_O30_H)
    extrude(amount=CORTE_EXTRUS_O9_DEPTH, mode=Mode.SUBTRACT)

    # Ressalto-extrusão18: up to this face of the body (flat: up to its plane)
    ressalto_extrus_o18_end = Plane(part.part.faces().sort_by_distance((-4.475668498, 10.650350395, -6.1))[0])
    # Esboço31 → Ressalto-extrusão18 (add, up to the picked face)
    with BuildSketch(Plane.XY.offset(-14.46), mode=Mode.PRIVATE) as ressalto_extrus_o18_sk1:
        with Locations((-26.462268067, 9.78)):
            Rectangle(ESBO_O31_W, ESBO_O31_H)
    ressalto_extrus_o18_tool1 = split(extrude(ressalto_extrus_o18_sk1.sketch, amount=RESSALTO_EXTRUS_O18_REACH, mode=Mode.PRIVATE), bisect_by=ressalto_extrus_o18_end, keep=Keep.BOTH, mode=Mode.PRIVATE)
    add(ressalto_extrus_o18_tool1.solids().sort_by(Axis((-26.462268, 9.78, -14.46), (0, 0, 1)))[0])

    # Ressalto-extrusão18 direction 2: up to this face of the body (flat: up to its plane)
    ressalto_extrus_o18_direction_2_end = Plane(part.part.faces().sort_by_distance((-28.083039106, 35.073559946, -20.46))[0])
    # Esboço31 → Ressalto-extrusão18 direction 2 (add, up to the picked face)
    with BuildSketch(Plane.XY.offset(-14.46), mode=Mode.PRIVATE) as ressalto_extrus_o18_direction_2_sk1:
        with Locations((-26.462268067, 9.78)):
            Rectangle(ESBO_O31_W, ESBO_O31_H)
    ressalto_extrus_o18_direction_2_tool1 = split(extrude(ressalto_extrus_o18_direction_2_sk1.sketch, amount=-RESSALTO_EXTRUS_O18_DIRECTION_2_REACH, mode=Mode.PRIVATE), bisect_by=ressalto_extrus_o18_direction_2_end, keep=Keep.BOTH, mode=Mode.PRIVATE)
    add(ressalto_extrus_o18_direction_2_tool1.solids().sort_by(Axis((-26.462268, 9.78, -14.46), (0, 0, -1)))[0])

    # Esboço32 → Corte-extrusão10 (cut)
    with BuildSketch(Plane.XY.offset(-6.1)):
        with Locations((-25.11, 10.100818907)):
            Circle(ESBO_O32_R)
    extrude(amount=-CORTE_EXTRUS_O10_DEPTH, mode=Mode.SUBTRACT)

    # Esboço33 → Corte-extrusão11 (cut)
    with BuildSketch(Plane.XY.offset(-6.1).offset(CORTE_EXTRUS_O11_START)):
        Polygon((-28.26, 8.282165559), (-28.26, 11.919472254), (-25.11, 13.738125602), (-21.96, 11.919472254), (-21.96, 8.282165559), (-21.96, 5.53), (-28.26, 5.53), align=None)
    extrude(amount=-CORTE_EXTRUS_O11_DEPTH, mode=Mode.SUBTRACT)


solid = part.part
